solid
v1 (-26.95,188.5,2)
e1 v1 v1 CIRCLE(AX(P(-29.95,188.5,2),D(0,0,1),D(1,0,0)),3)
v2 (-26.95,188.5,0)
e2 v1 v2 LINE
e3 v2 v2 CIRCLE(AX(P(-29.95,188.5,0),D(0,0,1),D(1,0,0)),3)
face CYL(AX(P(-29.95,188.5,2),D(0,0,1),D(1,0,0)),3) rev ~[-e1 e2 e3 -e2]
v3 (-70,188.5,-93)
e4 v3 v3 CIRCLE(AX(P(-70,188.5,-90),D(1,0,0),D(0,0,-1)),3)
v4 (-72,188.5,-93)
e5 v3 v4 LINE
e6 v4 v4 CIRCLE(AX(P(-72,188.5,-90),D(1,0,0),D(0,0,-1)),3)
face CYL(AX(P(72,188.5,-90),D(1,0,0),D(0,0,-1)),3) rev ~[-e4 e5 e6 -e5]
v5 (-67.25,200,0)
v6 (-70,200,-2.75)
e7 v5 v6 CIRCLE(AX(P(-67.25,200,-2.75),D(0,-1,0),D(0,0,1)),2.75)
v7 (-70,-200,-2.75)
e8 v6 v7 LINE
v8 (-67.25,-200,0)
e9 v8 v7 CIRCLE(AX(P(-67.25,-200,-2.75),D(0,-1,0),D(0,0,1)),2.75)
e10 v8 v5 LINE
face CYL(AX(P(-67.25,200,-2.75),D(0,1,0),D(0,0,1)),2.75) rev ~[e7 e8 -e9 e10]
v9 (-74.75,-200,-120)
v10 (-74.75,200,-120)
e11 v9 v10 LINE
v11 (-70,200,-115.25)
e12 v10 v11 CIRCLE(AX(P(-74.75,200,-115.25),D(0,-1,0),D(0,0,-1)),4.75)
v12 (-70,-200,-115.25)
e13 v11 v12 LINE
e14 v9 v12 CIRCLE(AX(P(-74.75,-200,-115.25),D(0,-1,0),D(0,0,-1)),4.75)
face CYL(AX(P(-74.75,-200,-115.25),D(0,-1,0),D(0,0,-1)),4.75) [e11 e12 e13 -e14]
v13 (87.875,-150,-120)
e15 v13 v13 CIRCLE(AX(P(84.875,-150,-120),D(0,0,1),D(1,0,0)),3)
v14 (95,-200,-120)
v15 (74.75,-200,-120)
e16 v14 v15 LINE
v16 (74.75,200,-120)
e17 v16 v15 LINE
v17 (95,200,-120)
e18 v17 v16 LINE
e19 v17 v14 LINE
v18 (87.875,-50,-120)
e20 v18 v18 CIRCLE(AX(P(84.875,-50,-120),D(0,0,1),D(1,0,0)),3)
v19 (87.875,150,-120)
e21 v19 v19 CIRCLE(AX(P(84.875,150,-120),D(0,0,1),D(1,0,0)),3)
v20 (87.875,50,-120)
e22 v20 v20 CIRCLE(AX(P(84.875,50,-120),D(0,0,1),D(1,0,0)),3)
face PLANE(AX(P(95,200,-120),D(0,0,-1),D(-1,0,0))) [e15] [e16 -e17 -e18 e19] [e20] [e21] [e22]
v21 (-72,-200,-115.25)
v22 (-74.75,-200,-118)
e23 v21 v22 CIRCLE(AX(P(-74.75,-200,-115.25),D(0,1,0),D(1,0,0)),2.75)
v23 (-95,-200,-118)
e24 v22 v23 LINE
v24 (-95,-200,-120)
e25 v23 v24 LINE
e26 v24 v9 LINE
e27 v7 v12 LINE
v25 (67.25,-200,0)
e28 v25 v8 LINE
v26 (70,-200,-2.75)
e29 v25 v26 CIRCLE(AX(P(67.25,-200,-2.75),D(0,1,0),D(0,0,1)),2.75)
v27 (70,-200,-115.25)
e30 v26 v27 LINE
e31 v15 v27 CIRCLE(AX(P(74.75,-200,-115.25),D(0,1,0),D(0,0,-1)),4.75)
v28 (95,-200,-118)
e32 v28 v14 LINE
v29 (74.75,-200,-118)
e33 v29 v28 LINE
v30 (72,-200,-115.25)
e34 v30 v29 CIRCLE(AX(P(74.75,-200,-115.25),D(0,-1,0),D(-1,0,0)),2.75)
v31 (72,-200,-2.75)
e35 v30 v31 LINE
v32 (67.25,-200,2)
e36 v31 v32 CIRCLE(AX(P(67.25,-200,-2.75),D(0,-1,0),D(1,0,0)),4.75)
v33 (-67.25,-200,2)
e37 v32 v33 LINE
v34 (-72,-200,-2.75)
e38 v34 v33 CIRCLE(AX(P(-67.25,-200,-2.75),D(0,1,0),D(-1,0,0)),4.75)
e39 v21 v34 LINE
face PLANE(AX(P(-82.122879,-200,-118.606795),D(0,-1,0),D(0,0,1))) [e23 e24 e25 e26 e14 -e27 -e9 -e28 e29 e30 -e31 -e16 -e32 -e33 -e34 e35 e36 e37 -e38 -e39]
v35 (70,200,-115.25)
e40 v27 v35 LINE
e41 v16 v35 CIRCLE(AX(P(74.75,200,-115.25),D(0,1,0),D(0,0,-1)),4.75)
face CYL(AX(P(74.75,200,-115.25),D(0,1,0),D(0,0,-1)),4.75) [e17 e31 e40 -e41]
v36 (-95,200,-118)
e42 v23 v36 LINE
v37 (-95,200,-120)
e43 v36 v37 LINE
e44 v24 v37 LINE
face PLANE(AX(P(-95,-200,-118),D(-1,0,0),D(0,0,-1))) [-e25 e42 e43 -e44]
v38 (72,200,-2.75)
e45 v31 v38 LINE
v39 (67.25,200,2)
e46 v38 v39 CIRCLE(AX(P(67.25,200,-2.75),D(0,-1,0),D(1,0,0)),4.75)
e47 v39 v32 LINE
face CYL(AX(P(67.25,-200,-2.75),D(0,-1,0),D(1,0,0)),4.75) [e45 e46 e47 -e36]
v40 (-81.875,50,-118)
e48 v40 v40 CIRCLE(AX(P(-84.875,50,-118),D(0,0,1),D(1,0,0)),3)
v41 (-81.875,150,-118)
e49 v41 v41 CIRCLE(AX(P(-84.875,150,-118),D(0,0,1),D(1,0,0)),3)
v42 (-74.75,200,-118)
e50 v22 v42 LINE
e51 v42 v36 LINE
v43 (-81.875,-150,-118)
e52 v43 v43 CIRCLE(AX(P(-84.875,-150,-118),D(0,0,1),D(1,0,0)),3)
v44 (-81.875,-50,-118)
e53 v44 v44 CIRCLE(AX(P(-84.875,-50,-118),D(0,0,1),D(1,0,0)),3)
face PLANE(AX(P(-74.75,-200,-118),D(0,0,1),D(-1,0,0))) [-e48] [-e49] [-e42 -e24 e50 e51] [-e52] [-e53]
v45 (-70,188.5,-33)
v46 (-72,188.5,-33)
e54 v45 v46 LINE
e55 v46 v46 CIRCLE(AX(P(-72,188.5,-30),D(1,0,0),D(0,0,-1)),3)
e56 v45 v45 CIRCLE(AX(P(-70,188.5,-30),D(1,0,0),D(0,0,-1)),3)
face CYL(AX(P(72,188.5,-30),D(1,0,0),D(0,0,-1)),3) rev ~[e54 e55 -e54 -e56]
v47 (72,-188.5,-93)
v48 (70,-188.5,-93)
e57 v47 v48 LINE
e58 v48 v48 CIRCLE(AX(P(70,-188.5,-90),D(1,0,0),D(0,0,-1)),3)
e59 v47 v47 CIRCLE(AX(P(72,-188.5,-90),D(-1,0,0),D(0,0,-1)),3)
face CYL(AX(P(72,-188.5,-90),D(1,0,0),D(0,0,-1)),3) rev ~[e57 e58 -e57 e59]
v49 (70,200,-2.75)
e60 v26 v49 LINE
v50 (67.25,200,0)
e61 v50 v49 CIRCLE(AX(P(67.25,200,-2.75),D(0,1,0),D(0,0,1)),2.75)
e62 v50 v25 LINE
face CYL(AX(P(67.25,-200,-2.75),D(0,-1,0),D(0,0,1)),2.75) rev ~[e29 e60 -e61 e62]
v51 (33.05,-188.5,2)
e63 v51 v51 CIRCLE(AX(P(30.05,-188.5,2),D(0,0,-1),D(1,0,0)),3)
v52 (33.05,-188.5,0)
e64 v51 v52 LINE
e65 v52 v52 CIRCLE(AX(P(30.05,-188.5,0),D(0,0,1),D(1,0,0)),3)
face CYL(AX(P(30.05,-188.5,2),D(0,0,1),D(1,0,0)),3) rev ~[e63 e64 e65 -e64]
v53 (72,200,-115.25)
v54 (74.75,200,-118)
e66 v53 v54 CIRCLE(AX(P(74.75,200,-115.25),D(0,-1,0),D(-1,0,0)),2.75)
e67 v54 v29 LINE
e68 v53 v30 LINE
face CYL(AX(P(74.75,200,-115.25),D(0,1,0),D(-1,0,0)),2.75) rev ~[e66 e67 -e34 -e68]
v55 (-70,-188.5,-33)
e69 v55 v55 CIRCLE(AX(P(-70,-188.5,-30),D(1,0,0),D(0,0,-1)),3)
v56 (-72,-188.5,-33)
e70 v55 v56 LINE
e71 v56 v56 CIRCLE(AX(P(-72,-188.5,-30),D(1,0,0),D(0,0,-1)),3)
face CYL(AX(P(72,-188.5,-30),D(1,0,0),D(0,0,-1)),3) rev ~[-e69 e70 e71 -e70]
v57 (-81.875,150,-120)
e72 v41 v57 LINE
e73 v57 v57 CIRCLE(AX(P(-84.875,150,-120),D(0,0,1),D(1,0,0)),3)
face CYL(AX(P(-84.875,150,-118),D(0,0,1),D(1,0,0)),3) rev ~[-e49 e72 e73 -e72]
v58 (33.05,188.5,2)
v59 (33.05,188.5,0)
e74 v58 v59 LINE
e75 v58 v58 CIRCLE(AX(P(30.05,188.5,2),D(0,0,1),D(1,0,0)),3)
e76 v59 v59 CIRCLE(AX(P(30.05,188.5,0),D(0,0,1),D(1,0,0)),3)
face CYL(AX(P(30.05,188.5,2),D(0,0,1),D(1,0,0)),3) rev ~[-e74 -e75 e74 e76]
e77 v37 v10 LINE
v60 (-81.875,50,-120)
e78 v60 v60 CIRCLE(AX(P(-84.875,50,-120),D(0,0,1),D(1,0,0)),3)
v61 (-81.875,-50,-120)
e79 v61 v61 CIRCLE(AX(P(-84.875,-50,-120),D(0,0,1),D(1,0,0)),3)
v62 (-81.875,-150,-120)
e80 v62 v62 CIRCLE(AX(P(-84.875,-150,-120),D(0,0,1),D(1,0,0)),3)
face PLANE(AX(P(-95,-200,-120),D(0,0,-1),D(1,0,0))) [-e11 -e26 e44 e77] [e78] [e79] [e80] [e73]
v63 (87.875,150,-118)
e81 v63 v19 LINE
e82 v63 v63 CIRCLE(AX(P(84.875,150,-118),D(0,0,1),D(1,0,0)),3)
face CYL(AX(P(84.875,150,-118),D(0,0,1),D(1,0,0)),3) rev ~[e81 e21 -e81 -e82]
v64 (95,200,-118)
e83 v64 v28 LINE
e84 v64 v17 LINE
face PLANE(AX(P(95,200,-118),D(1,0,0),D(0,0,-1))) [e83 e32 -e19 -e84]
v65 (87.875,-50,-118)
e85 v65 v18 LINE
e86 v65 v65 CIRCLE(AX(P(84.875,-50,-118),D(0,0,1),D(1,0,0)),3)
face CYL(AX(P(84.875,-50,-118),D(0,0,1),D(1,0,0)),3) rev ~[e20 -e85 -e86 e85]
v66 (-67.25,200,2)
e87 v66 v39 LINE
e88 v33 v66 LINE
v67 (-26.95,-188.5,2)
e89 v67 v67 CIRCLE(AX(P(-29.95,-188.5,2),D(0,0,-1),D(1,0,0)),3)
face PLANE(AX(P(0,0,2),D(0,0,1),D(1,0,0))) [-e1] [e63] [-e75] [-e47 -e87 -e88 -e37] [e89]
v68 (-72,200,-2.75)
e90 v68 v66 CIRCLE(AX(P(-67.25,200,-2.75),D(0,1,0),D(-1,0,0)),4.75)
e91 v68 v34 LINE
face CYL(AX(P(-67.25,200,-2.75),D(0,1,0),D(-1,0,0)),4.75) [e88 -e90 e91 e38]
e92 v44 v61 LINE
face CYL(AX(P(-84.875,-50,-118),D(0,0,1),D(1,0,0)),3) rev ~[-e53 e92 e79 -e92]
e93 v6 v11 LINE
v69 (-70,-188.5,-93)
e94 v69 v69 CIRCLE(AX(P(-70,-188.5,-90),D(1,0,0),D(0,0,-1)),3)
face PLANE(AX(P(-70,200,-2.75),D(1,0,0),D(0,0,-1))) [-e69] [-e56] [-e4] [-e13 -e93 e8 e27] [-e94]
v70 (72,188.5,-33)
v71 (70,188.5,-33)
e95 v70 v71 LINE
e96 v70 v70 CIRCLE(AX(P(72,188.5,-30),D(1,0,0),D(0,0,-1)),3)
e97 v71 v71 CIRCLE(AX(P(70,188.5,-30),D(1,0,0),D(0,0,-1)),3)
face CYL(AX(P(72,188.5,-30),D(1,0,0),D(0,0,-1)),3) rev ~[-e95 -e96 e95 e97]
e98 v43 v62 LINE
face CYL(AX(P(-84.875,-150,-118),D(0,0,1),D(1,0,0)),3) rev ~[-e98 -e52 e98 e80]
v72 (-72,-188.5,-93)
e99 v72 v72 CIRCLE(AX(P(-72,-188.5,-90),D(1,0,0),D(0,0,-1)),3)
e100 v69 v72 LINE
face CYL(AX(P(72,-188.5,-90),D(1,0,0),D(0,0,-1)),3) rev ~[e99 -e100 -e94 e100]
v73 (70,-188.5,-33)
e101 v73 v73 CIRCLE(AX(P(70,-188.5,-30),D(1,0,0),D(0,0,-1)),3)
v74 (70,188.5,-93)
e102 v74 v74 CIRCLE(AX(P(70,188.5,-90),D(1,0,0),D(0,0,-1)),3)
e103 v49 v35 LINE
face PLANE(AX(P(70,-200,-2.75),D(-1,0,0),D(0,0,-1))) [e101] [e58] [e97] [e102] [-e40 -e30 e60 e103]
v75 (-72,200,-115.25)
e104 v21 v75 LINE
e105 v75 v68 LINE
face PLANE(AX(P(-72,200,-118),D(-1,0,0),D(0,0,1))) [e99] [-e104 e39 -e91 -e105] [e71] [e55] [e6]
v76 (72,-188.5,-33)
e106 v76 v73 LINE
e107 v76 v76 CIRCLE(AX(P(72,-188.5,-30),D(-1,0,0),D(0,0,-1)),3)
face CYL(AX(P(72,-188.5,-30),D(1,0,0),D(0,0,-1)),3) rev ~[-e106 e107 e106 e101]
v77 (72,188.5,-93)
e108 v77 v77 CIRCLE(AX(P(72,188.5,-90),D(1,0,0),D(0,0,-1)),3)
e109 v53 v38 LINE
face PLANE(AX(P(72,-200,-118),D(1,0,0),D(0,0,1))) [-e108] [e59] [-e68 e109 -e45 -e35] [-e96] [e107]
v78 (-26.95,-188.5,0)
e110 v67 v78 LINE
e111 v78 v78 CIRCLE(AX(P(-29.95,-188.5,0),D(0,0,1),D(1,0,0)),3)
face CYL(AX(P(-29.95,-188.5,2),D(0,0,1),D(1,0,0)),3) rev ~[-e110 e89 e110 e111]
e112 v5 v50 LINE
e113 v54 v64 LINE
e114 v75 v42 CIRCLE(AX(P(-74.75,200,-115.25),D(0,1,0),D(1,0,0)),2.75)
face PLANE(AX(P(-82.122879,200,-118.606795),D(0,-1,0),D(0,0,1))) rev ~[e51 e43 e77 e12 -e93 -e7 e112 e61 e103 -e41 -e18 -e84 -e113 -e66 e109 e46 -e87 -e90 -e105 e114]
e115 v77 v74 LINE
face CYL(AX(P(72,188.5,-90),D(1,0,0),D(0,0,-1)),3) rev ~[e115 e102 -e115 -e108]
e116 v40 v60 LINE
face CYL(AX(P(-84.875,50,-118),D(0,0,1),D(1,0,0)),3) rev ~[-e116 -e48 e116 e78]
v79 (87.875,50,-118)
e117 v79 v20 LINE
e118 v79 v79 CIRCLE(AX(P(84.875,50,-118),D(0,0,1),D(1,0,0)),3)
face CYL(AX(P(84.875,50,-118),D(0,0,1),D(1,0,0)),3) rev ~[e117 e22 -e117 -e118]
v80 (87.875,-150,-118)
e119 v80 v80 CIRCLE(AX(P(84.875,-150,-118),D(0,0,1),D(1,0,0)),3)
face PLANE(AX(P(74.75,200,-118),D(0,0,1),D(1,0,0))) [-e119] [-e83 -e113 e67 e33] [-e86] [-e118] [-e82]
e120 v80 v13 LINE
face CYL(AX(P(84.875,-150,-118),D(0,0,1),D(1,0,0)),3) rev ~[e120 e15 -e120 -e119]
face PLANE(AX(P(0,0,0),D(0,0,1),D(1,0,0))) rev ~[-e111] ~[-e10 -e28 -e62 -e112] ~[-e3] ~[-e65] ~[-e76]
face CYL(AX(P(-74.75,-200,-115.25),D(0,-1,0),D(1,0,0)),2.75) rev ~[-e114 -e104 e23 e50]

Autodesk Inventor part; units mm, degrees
ref_plane "YZ Plane" through (0, 0, 0) normal (1, 0, 0) x (0, 1, 0)
ref_plane "XZ Plane" through (0, 0, 0) normal (0, 1, 0) x (-1, 0, 0)
ref_plane "XY Plane" through (0, 0, 0) normal (0, 0, 1) x (1, 0, 0)
sketch "Sketch1" plane through (0, 0, 0) normal (0, 0, 1) x (1, 0, 0)
  line L0 (-70, 200) -> (70, 200)
  line L1 (70, 200) -> (70, -200)
  line L2 (70, -200) -> (-70, -200)
  line L3 (-70, -200) -> (-70, 200)
  line L4 (-70, 200) -> (70, -200) construction
  point P0 (0, 0)
  point P1 (0, 0)
  dimension "d0" = 140
  dimension "d1" = 400
extrude "Plate1" add sketch "Sketch1" along normal blind 2
sketch "Sketch2" plane through (72, -200, 2) normal (-1, 0, 0) x (0, -1, 0)
  line L0 (-400, 0) -> (0, 0)
  line L1 (0, 0) -> (0, -120)
  line L2 (0, -120) -> (-400, -120)
  line L3 (-400, -120) -> (-400, 0)
edge flange "Flange1" height 120 angle 90 thickness 2 bend radius 2.75 thickness toward (-1, 0, 0) relief round relief width 2 relief depth 1 edges at (70, 0, 0) wall of the first edge with corners at (72, 200, 2) (72, -200, 2) (72, -200, -118) (72, 200, -118)
bend "Bend1"
corner "Corner1"
sketch "Sketch3" plane through (-72, 200, 2) normal (1, 0, 0) x (0, 1, 0)
  line L0 (-400, 0) -> (0, 0)
  line L1 (0, 0) -> (0, -120)
  line L2 (0, -120) -> (-400, -120)
  line L3 (-400, -120) -> (-400, 0)
edge flange "Flange2" height 120 angle 90 thickness 2 bend radius 2.75 thickness toward (1, 0, 0) relief round relief width 2 relief depth 1 edges at (-70, 0, 0) wall of the first edge with corners at (-72, -200, 2) (-72, 200, 2) (-72, 200, -118) (-72, -200, -118)
bend "Bend2"
corner "Corner2"
sketch "Sketch4" plane through (70, 200, -120) normal (0, 0, 1) x (1, 0, 0)
  line L0 (0, -400) -> (0, 0)
  line L1 (0, 0) -> (25, 0)
  line L2 (25, 0) -> (25, -400)
  line L3 (25, -400) -> (0, -400)
edge flange "Flange3" height 25 angle 90 thickness 2 bend radius 2.75 thickness toward (0, 0, 1) relief round relief width 2 relief depth 1 edges at (72, 0, -118) wall of the first edge with corners at (70, -200, -120) (70, 200, -120) (95, 200, -120) (95, -200, -120)
bend "Bend3"
corner "Corner3"
sketch "Sketch5" plane through (-70, -200, -120) normal (0, 0, 1) x (1, 0, 0)
  line L0 (0, 400) -> (0, 0)
  line L1 (0, 0) -> (-25, 0)
  line L2 (-25, 0) -> (-25, 400)
  line L3 (-25, 400) -> (0, 400)
edge flange "Flange4" height 25 angle 90 thickness 2 bend radius 2.75 thickness toward (0, 0, 1) relief round relief width 2 relief depth 1 edges at (-72, 0, -118) wall of the first edge with corners at (-70, 200, -120) (-70, -200, -120) (-95, -200, -120) (-95, 200, -120)
bend "Bend4"
corner "Corner4"
sketch "Sketch6" plane through (95, -200, -118) normal (0, 0, 1) x (1, 0, 0)
  circle A0 centre (-10.125, 350) radius 3
  line L0 (-20.25, 400) -> (0, 400) projected
  point P0 (-95, 200)
  point P1 (-10.125, 400)
  dimension "d43" = 6
  dimension "d44" = 50
extrude "Extrusion1" cut sketch "Sketch6" against normal through all
pattern_linear "Rectangular Pattern2" count 4 spacing 100 along (0, -1, 0) count 2 spacing 169.75 along (-1, 0, 0) of "Extrusion1"
sketch "Sketch8" plane through (72, -200, -2.75) normal (1, 0, 0) x (0, 0, -1)
  line L0 (0, 400) -> (112.5, 400) projected
  line L1 (117.25, 0) -> (117.25, 400) projected
  circle A0 centre (87.25, 388.5) radius 3
  circle A1 centre (27.25, 388.5) radius 3
  point P0 (-2.75, 200)
  dimension "d68" = 6
  dimension "d69" = 60
  dimension "d78" = 30
  dimension "d79" = 11.5
extrude "Extrusion3" cut sketch "Sketch8" against normal through all
sketch "Sketch9" plane through (0, 0, 2) normal (0, 0, 1) x (1, 0, 0)
  circle A0 centre (-29.95, 188.5) radius 3
  line L0 (-67.25, 200) -> (67.25, 200) projected
  line L1 (-67.25, 200) -> (-67.25, -200) projected
  circle A1 centre (30.05, 188.5) radius 3
  point P0 (0, 0)
  point P1 (67.25, 200)
  dimension "d72" = 6
  dimension "d73" = 11.5
  dimension "d74" = 37.3
  dimension "d80" = 60
extrude "Extrusion4" cut sketch "Sketch9" against normal through all
mirror "Mirror2" about plane through (0, 0, 0) normal (0, 1, 0) of "Extrusion3", "Extrusion4"
equation "\"d0\" = Ширина_крепления_корпуса"
equation "\"d1\" = Длина_базовой_пластины"
equation "\"d69\" = 0.5 * Длина_крепления_корпуса"
equation "\"d2\" = Thickness"
equation "\"d3\" = BendReliefWidth"
equation "\"d4\" = BendReliefDepth"
equation "\"d5\" = MinimumRemnant"
equation "\"d6\" = TransitionRadius"
equation "\"d7\" = Длина_крепления_корпуса"
equation "\"d9\" = BendRadius"
equation "\"d10\" = CornerReliefSize"
equation "\"d11\" = GapSize"
equation "\"d12\" = JacobiRadiusSize"
equation "\"d13\" = BendReliefWidth"
equation "\"d14\" = BendReliefDepth"
equation "\"d15\" = MinimumRemnant"
equation "\"d16\" = TransitionRadius"
equation "\"d17\" = Длина_крепления_корпуса"
equation "\"d19\" = BendRadius"
equation "\"d20\" = CornerReliefSize"
equation "\"d21\" = GapSize"
equation "\"d22\" = JacobiRadiusSize"
equation "\"d23\" = BendReliefWidth"
equation "\"d24\" = BendReliefDepth"
equation "\"d25\" = MinimumRemnant"
equation "\"d26\" = TransitionRadius"
equation "\"d29\" = BendRadius"
equation "\"d30\" = CornerReliefSize"
equation "\"d31\" = GapSize"
equation "\"d32\" = JacobiRadiusSize"
equation "\"d33\" = BendReliefWidth"
equation "\"d34\" = BendReliefDepth"
equation "\"d35\" = MinimumRemnant"
equation "\"d36\" = TransitionRadius"
equation "\"d39\" = BendRadius"
equation "\"d40\" = CornerReliefSize"
equation "\"d41\" = GapSize"
equation "\"d42\" = JacobiRadiusSize"
equation "\"BendReliefWidth\" = Thickness"
equation "\"BendReliefDepth\" = 0.5 * Thickness"
equation "\"CornerReliefSize\" = 4 * Thickness"
equation "\"MinimumRemnant\" = 2 * Thickness"
equation "\"TransitionRadius\" = BendRadius"
equation "\"JacobiRadiusSize\" = BendRadius"
equation "\"GapSize\" = Thickness"
equation "\"Ширина_крепления_корпуса\" = 140"
equation "\"Длина_базовой_пластины\" = 400"
equation "\"Длина_крепления_корпуса\" = 120"
equation "\"Thickness\" = 2"
equation "\"BendRadius\" = 2.75"
properties part number "Кожух" material "Stainless Steel"
